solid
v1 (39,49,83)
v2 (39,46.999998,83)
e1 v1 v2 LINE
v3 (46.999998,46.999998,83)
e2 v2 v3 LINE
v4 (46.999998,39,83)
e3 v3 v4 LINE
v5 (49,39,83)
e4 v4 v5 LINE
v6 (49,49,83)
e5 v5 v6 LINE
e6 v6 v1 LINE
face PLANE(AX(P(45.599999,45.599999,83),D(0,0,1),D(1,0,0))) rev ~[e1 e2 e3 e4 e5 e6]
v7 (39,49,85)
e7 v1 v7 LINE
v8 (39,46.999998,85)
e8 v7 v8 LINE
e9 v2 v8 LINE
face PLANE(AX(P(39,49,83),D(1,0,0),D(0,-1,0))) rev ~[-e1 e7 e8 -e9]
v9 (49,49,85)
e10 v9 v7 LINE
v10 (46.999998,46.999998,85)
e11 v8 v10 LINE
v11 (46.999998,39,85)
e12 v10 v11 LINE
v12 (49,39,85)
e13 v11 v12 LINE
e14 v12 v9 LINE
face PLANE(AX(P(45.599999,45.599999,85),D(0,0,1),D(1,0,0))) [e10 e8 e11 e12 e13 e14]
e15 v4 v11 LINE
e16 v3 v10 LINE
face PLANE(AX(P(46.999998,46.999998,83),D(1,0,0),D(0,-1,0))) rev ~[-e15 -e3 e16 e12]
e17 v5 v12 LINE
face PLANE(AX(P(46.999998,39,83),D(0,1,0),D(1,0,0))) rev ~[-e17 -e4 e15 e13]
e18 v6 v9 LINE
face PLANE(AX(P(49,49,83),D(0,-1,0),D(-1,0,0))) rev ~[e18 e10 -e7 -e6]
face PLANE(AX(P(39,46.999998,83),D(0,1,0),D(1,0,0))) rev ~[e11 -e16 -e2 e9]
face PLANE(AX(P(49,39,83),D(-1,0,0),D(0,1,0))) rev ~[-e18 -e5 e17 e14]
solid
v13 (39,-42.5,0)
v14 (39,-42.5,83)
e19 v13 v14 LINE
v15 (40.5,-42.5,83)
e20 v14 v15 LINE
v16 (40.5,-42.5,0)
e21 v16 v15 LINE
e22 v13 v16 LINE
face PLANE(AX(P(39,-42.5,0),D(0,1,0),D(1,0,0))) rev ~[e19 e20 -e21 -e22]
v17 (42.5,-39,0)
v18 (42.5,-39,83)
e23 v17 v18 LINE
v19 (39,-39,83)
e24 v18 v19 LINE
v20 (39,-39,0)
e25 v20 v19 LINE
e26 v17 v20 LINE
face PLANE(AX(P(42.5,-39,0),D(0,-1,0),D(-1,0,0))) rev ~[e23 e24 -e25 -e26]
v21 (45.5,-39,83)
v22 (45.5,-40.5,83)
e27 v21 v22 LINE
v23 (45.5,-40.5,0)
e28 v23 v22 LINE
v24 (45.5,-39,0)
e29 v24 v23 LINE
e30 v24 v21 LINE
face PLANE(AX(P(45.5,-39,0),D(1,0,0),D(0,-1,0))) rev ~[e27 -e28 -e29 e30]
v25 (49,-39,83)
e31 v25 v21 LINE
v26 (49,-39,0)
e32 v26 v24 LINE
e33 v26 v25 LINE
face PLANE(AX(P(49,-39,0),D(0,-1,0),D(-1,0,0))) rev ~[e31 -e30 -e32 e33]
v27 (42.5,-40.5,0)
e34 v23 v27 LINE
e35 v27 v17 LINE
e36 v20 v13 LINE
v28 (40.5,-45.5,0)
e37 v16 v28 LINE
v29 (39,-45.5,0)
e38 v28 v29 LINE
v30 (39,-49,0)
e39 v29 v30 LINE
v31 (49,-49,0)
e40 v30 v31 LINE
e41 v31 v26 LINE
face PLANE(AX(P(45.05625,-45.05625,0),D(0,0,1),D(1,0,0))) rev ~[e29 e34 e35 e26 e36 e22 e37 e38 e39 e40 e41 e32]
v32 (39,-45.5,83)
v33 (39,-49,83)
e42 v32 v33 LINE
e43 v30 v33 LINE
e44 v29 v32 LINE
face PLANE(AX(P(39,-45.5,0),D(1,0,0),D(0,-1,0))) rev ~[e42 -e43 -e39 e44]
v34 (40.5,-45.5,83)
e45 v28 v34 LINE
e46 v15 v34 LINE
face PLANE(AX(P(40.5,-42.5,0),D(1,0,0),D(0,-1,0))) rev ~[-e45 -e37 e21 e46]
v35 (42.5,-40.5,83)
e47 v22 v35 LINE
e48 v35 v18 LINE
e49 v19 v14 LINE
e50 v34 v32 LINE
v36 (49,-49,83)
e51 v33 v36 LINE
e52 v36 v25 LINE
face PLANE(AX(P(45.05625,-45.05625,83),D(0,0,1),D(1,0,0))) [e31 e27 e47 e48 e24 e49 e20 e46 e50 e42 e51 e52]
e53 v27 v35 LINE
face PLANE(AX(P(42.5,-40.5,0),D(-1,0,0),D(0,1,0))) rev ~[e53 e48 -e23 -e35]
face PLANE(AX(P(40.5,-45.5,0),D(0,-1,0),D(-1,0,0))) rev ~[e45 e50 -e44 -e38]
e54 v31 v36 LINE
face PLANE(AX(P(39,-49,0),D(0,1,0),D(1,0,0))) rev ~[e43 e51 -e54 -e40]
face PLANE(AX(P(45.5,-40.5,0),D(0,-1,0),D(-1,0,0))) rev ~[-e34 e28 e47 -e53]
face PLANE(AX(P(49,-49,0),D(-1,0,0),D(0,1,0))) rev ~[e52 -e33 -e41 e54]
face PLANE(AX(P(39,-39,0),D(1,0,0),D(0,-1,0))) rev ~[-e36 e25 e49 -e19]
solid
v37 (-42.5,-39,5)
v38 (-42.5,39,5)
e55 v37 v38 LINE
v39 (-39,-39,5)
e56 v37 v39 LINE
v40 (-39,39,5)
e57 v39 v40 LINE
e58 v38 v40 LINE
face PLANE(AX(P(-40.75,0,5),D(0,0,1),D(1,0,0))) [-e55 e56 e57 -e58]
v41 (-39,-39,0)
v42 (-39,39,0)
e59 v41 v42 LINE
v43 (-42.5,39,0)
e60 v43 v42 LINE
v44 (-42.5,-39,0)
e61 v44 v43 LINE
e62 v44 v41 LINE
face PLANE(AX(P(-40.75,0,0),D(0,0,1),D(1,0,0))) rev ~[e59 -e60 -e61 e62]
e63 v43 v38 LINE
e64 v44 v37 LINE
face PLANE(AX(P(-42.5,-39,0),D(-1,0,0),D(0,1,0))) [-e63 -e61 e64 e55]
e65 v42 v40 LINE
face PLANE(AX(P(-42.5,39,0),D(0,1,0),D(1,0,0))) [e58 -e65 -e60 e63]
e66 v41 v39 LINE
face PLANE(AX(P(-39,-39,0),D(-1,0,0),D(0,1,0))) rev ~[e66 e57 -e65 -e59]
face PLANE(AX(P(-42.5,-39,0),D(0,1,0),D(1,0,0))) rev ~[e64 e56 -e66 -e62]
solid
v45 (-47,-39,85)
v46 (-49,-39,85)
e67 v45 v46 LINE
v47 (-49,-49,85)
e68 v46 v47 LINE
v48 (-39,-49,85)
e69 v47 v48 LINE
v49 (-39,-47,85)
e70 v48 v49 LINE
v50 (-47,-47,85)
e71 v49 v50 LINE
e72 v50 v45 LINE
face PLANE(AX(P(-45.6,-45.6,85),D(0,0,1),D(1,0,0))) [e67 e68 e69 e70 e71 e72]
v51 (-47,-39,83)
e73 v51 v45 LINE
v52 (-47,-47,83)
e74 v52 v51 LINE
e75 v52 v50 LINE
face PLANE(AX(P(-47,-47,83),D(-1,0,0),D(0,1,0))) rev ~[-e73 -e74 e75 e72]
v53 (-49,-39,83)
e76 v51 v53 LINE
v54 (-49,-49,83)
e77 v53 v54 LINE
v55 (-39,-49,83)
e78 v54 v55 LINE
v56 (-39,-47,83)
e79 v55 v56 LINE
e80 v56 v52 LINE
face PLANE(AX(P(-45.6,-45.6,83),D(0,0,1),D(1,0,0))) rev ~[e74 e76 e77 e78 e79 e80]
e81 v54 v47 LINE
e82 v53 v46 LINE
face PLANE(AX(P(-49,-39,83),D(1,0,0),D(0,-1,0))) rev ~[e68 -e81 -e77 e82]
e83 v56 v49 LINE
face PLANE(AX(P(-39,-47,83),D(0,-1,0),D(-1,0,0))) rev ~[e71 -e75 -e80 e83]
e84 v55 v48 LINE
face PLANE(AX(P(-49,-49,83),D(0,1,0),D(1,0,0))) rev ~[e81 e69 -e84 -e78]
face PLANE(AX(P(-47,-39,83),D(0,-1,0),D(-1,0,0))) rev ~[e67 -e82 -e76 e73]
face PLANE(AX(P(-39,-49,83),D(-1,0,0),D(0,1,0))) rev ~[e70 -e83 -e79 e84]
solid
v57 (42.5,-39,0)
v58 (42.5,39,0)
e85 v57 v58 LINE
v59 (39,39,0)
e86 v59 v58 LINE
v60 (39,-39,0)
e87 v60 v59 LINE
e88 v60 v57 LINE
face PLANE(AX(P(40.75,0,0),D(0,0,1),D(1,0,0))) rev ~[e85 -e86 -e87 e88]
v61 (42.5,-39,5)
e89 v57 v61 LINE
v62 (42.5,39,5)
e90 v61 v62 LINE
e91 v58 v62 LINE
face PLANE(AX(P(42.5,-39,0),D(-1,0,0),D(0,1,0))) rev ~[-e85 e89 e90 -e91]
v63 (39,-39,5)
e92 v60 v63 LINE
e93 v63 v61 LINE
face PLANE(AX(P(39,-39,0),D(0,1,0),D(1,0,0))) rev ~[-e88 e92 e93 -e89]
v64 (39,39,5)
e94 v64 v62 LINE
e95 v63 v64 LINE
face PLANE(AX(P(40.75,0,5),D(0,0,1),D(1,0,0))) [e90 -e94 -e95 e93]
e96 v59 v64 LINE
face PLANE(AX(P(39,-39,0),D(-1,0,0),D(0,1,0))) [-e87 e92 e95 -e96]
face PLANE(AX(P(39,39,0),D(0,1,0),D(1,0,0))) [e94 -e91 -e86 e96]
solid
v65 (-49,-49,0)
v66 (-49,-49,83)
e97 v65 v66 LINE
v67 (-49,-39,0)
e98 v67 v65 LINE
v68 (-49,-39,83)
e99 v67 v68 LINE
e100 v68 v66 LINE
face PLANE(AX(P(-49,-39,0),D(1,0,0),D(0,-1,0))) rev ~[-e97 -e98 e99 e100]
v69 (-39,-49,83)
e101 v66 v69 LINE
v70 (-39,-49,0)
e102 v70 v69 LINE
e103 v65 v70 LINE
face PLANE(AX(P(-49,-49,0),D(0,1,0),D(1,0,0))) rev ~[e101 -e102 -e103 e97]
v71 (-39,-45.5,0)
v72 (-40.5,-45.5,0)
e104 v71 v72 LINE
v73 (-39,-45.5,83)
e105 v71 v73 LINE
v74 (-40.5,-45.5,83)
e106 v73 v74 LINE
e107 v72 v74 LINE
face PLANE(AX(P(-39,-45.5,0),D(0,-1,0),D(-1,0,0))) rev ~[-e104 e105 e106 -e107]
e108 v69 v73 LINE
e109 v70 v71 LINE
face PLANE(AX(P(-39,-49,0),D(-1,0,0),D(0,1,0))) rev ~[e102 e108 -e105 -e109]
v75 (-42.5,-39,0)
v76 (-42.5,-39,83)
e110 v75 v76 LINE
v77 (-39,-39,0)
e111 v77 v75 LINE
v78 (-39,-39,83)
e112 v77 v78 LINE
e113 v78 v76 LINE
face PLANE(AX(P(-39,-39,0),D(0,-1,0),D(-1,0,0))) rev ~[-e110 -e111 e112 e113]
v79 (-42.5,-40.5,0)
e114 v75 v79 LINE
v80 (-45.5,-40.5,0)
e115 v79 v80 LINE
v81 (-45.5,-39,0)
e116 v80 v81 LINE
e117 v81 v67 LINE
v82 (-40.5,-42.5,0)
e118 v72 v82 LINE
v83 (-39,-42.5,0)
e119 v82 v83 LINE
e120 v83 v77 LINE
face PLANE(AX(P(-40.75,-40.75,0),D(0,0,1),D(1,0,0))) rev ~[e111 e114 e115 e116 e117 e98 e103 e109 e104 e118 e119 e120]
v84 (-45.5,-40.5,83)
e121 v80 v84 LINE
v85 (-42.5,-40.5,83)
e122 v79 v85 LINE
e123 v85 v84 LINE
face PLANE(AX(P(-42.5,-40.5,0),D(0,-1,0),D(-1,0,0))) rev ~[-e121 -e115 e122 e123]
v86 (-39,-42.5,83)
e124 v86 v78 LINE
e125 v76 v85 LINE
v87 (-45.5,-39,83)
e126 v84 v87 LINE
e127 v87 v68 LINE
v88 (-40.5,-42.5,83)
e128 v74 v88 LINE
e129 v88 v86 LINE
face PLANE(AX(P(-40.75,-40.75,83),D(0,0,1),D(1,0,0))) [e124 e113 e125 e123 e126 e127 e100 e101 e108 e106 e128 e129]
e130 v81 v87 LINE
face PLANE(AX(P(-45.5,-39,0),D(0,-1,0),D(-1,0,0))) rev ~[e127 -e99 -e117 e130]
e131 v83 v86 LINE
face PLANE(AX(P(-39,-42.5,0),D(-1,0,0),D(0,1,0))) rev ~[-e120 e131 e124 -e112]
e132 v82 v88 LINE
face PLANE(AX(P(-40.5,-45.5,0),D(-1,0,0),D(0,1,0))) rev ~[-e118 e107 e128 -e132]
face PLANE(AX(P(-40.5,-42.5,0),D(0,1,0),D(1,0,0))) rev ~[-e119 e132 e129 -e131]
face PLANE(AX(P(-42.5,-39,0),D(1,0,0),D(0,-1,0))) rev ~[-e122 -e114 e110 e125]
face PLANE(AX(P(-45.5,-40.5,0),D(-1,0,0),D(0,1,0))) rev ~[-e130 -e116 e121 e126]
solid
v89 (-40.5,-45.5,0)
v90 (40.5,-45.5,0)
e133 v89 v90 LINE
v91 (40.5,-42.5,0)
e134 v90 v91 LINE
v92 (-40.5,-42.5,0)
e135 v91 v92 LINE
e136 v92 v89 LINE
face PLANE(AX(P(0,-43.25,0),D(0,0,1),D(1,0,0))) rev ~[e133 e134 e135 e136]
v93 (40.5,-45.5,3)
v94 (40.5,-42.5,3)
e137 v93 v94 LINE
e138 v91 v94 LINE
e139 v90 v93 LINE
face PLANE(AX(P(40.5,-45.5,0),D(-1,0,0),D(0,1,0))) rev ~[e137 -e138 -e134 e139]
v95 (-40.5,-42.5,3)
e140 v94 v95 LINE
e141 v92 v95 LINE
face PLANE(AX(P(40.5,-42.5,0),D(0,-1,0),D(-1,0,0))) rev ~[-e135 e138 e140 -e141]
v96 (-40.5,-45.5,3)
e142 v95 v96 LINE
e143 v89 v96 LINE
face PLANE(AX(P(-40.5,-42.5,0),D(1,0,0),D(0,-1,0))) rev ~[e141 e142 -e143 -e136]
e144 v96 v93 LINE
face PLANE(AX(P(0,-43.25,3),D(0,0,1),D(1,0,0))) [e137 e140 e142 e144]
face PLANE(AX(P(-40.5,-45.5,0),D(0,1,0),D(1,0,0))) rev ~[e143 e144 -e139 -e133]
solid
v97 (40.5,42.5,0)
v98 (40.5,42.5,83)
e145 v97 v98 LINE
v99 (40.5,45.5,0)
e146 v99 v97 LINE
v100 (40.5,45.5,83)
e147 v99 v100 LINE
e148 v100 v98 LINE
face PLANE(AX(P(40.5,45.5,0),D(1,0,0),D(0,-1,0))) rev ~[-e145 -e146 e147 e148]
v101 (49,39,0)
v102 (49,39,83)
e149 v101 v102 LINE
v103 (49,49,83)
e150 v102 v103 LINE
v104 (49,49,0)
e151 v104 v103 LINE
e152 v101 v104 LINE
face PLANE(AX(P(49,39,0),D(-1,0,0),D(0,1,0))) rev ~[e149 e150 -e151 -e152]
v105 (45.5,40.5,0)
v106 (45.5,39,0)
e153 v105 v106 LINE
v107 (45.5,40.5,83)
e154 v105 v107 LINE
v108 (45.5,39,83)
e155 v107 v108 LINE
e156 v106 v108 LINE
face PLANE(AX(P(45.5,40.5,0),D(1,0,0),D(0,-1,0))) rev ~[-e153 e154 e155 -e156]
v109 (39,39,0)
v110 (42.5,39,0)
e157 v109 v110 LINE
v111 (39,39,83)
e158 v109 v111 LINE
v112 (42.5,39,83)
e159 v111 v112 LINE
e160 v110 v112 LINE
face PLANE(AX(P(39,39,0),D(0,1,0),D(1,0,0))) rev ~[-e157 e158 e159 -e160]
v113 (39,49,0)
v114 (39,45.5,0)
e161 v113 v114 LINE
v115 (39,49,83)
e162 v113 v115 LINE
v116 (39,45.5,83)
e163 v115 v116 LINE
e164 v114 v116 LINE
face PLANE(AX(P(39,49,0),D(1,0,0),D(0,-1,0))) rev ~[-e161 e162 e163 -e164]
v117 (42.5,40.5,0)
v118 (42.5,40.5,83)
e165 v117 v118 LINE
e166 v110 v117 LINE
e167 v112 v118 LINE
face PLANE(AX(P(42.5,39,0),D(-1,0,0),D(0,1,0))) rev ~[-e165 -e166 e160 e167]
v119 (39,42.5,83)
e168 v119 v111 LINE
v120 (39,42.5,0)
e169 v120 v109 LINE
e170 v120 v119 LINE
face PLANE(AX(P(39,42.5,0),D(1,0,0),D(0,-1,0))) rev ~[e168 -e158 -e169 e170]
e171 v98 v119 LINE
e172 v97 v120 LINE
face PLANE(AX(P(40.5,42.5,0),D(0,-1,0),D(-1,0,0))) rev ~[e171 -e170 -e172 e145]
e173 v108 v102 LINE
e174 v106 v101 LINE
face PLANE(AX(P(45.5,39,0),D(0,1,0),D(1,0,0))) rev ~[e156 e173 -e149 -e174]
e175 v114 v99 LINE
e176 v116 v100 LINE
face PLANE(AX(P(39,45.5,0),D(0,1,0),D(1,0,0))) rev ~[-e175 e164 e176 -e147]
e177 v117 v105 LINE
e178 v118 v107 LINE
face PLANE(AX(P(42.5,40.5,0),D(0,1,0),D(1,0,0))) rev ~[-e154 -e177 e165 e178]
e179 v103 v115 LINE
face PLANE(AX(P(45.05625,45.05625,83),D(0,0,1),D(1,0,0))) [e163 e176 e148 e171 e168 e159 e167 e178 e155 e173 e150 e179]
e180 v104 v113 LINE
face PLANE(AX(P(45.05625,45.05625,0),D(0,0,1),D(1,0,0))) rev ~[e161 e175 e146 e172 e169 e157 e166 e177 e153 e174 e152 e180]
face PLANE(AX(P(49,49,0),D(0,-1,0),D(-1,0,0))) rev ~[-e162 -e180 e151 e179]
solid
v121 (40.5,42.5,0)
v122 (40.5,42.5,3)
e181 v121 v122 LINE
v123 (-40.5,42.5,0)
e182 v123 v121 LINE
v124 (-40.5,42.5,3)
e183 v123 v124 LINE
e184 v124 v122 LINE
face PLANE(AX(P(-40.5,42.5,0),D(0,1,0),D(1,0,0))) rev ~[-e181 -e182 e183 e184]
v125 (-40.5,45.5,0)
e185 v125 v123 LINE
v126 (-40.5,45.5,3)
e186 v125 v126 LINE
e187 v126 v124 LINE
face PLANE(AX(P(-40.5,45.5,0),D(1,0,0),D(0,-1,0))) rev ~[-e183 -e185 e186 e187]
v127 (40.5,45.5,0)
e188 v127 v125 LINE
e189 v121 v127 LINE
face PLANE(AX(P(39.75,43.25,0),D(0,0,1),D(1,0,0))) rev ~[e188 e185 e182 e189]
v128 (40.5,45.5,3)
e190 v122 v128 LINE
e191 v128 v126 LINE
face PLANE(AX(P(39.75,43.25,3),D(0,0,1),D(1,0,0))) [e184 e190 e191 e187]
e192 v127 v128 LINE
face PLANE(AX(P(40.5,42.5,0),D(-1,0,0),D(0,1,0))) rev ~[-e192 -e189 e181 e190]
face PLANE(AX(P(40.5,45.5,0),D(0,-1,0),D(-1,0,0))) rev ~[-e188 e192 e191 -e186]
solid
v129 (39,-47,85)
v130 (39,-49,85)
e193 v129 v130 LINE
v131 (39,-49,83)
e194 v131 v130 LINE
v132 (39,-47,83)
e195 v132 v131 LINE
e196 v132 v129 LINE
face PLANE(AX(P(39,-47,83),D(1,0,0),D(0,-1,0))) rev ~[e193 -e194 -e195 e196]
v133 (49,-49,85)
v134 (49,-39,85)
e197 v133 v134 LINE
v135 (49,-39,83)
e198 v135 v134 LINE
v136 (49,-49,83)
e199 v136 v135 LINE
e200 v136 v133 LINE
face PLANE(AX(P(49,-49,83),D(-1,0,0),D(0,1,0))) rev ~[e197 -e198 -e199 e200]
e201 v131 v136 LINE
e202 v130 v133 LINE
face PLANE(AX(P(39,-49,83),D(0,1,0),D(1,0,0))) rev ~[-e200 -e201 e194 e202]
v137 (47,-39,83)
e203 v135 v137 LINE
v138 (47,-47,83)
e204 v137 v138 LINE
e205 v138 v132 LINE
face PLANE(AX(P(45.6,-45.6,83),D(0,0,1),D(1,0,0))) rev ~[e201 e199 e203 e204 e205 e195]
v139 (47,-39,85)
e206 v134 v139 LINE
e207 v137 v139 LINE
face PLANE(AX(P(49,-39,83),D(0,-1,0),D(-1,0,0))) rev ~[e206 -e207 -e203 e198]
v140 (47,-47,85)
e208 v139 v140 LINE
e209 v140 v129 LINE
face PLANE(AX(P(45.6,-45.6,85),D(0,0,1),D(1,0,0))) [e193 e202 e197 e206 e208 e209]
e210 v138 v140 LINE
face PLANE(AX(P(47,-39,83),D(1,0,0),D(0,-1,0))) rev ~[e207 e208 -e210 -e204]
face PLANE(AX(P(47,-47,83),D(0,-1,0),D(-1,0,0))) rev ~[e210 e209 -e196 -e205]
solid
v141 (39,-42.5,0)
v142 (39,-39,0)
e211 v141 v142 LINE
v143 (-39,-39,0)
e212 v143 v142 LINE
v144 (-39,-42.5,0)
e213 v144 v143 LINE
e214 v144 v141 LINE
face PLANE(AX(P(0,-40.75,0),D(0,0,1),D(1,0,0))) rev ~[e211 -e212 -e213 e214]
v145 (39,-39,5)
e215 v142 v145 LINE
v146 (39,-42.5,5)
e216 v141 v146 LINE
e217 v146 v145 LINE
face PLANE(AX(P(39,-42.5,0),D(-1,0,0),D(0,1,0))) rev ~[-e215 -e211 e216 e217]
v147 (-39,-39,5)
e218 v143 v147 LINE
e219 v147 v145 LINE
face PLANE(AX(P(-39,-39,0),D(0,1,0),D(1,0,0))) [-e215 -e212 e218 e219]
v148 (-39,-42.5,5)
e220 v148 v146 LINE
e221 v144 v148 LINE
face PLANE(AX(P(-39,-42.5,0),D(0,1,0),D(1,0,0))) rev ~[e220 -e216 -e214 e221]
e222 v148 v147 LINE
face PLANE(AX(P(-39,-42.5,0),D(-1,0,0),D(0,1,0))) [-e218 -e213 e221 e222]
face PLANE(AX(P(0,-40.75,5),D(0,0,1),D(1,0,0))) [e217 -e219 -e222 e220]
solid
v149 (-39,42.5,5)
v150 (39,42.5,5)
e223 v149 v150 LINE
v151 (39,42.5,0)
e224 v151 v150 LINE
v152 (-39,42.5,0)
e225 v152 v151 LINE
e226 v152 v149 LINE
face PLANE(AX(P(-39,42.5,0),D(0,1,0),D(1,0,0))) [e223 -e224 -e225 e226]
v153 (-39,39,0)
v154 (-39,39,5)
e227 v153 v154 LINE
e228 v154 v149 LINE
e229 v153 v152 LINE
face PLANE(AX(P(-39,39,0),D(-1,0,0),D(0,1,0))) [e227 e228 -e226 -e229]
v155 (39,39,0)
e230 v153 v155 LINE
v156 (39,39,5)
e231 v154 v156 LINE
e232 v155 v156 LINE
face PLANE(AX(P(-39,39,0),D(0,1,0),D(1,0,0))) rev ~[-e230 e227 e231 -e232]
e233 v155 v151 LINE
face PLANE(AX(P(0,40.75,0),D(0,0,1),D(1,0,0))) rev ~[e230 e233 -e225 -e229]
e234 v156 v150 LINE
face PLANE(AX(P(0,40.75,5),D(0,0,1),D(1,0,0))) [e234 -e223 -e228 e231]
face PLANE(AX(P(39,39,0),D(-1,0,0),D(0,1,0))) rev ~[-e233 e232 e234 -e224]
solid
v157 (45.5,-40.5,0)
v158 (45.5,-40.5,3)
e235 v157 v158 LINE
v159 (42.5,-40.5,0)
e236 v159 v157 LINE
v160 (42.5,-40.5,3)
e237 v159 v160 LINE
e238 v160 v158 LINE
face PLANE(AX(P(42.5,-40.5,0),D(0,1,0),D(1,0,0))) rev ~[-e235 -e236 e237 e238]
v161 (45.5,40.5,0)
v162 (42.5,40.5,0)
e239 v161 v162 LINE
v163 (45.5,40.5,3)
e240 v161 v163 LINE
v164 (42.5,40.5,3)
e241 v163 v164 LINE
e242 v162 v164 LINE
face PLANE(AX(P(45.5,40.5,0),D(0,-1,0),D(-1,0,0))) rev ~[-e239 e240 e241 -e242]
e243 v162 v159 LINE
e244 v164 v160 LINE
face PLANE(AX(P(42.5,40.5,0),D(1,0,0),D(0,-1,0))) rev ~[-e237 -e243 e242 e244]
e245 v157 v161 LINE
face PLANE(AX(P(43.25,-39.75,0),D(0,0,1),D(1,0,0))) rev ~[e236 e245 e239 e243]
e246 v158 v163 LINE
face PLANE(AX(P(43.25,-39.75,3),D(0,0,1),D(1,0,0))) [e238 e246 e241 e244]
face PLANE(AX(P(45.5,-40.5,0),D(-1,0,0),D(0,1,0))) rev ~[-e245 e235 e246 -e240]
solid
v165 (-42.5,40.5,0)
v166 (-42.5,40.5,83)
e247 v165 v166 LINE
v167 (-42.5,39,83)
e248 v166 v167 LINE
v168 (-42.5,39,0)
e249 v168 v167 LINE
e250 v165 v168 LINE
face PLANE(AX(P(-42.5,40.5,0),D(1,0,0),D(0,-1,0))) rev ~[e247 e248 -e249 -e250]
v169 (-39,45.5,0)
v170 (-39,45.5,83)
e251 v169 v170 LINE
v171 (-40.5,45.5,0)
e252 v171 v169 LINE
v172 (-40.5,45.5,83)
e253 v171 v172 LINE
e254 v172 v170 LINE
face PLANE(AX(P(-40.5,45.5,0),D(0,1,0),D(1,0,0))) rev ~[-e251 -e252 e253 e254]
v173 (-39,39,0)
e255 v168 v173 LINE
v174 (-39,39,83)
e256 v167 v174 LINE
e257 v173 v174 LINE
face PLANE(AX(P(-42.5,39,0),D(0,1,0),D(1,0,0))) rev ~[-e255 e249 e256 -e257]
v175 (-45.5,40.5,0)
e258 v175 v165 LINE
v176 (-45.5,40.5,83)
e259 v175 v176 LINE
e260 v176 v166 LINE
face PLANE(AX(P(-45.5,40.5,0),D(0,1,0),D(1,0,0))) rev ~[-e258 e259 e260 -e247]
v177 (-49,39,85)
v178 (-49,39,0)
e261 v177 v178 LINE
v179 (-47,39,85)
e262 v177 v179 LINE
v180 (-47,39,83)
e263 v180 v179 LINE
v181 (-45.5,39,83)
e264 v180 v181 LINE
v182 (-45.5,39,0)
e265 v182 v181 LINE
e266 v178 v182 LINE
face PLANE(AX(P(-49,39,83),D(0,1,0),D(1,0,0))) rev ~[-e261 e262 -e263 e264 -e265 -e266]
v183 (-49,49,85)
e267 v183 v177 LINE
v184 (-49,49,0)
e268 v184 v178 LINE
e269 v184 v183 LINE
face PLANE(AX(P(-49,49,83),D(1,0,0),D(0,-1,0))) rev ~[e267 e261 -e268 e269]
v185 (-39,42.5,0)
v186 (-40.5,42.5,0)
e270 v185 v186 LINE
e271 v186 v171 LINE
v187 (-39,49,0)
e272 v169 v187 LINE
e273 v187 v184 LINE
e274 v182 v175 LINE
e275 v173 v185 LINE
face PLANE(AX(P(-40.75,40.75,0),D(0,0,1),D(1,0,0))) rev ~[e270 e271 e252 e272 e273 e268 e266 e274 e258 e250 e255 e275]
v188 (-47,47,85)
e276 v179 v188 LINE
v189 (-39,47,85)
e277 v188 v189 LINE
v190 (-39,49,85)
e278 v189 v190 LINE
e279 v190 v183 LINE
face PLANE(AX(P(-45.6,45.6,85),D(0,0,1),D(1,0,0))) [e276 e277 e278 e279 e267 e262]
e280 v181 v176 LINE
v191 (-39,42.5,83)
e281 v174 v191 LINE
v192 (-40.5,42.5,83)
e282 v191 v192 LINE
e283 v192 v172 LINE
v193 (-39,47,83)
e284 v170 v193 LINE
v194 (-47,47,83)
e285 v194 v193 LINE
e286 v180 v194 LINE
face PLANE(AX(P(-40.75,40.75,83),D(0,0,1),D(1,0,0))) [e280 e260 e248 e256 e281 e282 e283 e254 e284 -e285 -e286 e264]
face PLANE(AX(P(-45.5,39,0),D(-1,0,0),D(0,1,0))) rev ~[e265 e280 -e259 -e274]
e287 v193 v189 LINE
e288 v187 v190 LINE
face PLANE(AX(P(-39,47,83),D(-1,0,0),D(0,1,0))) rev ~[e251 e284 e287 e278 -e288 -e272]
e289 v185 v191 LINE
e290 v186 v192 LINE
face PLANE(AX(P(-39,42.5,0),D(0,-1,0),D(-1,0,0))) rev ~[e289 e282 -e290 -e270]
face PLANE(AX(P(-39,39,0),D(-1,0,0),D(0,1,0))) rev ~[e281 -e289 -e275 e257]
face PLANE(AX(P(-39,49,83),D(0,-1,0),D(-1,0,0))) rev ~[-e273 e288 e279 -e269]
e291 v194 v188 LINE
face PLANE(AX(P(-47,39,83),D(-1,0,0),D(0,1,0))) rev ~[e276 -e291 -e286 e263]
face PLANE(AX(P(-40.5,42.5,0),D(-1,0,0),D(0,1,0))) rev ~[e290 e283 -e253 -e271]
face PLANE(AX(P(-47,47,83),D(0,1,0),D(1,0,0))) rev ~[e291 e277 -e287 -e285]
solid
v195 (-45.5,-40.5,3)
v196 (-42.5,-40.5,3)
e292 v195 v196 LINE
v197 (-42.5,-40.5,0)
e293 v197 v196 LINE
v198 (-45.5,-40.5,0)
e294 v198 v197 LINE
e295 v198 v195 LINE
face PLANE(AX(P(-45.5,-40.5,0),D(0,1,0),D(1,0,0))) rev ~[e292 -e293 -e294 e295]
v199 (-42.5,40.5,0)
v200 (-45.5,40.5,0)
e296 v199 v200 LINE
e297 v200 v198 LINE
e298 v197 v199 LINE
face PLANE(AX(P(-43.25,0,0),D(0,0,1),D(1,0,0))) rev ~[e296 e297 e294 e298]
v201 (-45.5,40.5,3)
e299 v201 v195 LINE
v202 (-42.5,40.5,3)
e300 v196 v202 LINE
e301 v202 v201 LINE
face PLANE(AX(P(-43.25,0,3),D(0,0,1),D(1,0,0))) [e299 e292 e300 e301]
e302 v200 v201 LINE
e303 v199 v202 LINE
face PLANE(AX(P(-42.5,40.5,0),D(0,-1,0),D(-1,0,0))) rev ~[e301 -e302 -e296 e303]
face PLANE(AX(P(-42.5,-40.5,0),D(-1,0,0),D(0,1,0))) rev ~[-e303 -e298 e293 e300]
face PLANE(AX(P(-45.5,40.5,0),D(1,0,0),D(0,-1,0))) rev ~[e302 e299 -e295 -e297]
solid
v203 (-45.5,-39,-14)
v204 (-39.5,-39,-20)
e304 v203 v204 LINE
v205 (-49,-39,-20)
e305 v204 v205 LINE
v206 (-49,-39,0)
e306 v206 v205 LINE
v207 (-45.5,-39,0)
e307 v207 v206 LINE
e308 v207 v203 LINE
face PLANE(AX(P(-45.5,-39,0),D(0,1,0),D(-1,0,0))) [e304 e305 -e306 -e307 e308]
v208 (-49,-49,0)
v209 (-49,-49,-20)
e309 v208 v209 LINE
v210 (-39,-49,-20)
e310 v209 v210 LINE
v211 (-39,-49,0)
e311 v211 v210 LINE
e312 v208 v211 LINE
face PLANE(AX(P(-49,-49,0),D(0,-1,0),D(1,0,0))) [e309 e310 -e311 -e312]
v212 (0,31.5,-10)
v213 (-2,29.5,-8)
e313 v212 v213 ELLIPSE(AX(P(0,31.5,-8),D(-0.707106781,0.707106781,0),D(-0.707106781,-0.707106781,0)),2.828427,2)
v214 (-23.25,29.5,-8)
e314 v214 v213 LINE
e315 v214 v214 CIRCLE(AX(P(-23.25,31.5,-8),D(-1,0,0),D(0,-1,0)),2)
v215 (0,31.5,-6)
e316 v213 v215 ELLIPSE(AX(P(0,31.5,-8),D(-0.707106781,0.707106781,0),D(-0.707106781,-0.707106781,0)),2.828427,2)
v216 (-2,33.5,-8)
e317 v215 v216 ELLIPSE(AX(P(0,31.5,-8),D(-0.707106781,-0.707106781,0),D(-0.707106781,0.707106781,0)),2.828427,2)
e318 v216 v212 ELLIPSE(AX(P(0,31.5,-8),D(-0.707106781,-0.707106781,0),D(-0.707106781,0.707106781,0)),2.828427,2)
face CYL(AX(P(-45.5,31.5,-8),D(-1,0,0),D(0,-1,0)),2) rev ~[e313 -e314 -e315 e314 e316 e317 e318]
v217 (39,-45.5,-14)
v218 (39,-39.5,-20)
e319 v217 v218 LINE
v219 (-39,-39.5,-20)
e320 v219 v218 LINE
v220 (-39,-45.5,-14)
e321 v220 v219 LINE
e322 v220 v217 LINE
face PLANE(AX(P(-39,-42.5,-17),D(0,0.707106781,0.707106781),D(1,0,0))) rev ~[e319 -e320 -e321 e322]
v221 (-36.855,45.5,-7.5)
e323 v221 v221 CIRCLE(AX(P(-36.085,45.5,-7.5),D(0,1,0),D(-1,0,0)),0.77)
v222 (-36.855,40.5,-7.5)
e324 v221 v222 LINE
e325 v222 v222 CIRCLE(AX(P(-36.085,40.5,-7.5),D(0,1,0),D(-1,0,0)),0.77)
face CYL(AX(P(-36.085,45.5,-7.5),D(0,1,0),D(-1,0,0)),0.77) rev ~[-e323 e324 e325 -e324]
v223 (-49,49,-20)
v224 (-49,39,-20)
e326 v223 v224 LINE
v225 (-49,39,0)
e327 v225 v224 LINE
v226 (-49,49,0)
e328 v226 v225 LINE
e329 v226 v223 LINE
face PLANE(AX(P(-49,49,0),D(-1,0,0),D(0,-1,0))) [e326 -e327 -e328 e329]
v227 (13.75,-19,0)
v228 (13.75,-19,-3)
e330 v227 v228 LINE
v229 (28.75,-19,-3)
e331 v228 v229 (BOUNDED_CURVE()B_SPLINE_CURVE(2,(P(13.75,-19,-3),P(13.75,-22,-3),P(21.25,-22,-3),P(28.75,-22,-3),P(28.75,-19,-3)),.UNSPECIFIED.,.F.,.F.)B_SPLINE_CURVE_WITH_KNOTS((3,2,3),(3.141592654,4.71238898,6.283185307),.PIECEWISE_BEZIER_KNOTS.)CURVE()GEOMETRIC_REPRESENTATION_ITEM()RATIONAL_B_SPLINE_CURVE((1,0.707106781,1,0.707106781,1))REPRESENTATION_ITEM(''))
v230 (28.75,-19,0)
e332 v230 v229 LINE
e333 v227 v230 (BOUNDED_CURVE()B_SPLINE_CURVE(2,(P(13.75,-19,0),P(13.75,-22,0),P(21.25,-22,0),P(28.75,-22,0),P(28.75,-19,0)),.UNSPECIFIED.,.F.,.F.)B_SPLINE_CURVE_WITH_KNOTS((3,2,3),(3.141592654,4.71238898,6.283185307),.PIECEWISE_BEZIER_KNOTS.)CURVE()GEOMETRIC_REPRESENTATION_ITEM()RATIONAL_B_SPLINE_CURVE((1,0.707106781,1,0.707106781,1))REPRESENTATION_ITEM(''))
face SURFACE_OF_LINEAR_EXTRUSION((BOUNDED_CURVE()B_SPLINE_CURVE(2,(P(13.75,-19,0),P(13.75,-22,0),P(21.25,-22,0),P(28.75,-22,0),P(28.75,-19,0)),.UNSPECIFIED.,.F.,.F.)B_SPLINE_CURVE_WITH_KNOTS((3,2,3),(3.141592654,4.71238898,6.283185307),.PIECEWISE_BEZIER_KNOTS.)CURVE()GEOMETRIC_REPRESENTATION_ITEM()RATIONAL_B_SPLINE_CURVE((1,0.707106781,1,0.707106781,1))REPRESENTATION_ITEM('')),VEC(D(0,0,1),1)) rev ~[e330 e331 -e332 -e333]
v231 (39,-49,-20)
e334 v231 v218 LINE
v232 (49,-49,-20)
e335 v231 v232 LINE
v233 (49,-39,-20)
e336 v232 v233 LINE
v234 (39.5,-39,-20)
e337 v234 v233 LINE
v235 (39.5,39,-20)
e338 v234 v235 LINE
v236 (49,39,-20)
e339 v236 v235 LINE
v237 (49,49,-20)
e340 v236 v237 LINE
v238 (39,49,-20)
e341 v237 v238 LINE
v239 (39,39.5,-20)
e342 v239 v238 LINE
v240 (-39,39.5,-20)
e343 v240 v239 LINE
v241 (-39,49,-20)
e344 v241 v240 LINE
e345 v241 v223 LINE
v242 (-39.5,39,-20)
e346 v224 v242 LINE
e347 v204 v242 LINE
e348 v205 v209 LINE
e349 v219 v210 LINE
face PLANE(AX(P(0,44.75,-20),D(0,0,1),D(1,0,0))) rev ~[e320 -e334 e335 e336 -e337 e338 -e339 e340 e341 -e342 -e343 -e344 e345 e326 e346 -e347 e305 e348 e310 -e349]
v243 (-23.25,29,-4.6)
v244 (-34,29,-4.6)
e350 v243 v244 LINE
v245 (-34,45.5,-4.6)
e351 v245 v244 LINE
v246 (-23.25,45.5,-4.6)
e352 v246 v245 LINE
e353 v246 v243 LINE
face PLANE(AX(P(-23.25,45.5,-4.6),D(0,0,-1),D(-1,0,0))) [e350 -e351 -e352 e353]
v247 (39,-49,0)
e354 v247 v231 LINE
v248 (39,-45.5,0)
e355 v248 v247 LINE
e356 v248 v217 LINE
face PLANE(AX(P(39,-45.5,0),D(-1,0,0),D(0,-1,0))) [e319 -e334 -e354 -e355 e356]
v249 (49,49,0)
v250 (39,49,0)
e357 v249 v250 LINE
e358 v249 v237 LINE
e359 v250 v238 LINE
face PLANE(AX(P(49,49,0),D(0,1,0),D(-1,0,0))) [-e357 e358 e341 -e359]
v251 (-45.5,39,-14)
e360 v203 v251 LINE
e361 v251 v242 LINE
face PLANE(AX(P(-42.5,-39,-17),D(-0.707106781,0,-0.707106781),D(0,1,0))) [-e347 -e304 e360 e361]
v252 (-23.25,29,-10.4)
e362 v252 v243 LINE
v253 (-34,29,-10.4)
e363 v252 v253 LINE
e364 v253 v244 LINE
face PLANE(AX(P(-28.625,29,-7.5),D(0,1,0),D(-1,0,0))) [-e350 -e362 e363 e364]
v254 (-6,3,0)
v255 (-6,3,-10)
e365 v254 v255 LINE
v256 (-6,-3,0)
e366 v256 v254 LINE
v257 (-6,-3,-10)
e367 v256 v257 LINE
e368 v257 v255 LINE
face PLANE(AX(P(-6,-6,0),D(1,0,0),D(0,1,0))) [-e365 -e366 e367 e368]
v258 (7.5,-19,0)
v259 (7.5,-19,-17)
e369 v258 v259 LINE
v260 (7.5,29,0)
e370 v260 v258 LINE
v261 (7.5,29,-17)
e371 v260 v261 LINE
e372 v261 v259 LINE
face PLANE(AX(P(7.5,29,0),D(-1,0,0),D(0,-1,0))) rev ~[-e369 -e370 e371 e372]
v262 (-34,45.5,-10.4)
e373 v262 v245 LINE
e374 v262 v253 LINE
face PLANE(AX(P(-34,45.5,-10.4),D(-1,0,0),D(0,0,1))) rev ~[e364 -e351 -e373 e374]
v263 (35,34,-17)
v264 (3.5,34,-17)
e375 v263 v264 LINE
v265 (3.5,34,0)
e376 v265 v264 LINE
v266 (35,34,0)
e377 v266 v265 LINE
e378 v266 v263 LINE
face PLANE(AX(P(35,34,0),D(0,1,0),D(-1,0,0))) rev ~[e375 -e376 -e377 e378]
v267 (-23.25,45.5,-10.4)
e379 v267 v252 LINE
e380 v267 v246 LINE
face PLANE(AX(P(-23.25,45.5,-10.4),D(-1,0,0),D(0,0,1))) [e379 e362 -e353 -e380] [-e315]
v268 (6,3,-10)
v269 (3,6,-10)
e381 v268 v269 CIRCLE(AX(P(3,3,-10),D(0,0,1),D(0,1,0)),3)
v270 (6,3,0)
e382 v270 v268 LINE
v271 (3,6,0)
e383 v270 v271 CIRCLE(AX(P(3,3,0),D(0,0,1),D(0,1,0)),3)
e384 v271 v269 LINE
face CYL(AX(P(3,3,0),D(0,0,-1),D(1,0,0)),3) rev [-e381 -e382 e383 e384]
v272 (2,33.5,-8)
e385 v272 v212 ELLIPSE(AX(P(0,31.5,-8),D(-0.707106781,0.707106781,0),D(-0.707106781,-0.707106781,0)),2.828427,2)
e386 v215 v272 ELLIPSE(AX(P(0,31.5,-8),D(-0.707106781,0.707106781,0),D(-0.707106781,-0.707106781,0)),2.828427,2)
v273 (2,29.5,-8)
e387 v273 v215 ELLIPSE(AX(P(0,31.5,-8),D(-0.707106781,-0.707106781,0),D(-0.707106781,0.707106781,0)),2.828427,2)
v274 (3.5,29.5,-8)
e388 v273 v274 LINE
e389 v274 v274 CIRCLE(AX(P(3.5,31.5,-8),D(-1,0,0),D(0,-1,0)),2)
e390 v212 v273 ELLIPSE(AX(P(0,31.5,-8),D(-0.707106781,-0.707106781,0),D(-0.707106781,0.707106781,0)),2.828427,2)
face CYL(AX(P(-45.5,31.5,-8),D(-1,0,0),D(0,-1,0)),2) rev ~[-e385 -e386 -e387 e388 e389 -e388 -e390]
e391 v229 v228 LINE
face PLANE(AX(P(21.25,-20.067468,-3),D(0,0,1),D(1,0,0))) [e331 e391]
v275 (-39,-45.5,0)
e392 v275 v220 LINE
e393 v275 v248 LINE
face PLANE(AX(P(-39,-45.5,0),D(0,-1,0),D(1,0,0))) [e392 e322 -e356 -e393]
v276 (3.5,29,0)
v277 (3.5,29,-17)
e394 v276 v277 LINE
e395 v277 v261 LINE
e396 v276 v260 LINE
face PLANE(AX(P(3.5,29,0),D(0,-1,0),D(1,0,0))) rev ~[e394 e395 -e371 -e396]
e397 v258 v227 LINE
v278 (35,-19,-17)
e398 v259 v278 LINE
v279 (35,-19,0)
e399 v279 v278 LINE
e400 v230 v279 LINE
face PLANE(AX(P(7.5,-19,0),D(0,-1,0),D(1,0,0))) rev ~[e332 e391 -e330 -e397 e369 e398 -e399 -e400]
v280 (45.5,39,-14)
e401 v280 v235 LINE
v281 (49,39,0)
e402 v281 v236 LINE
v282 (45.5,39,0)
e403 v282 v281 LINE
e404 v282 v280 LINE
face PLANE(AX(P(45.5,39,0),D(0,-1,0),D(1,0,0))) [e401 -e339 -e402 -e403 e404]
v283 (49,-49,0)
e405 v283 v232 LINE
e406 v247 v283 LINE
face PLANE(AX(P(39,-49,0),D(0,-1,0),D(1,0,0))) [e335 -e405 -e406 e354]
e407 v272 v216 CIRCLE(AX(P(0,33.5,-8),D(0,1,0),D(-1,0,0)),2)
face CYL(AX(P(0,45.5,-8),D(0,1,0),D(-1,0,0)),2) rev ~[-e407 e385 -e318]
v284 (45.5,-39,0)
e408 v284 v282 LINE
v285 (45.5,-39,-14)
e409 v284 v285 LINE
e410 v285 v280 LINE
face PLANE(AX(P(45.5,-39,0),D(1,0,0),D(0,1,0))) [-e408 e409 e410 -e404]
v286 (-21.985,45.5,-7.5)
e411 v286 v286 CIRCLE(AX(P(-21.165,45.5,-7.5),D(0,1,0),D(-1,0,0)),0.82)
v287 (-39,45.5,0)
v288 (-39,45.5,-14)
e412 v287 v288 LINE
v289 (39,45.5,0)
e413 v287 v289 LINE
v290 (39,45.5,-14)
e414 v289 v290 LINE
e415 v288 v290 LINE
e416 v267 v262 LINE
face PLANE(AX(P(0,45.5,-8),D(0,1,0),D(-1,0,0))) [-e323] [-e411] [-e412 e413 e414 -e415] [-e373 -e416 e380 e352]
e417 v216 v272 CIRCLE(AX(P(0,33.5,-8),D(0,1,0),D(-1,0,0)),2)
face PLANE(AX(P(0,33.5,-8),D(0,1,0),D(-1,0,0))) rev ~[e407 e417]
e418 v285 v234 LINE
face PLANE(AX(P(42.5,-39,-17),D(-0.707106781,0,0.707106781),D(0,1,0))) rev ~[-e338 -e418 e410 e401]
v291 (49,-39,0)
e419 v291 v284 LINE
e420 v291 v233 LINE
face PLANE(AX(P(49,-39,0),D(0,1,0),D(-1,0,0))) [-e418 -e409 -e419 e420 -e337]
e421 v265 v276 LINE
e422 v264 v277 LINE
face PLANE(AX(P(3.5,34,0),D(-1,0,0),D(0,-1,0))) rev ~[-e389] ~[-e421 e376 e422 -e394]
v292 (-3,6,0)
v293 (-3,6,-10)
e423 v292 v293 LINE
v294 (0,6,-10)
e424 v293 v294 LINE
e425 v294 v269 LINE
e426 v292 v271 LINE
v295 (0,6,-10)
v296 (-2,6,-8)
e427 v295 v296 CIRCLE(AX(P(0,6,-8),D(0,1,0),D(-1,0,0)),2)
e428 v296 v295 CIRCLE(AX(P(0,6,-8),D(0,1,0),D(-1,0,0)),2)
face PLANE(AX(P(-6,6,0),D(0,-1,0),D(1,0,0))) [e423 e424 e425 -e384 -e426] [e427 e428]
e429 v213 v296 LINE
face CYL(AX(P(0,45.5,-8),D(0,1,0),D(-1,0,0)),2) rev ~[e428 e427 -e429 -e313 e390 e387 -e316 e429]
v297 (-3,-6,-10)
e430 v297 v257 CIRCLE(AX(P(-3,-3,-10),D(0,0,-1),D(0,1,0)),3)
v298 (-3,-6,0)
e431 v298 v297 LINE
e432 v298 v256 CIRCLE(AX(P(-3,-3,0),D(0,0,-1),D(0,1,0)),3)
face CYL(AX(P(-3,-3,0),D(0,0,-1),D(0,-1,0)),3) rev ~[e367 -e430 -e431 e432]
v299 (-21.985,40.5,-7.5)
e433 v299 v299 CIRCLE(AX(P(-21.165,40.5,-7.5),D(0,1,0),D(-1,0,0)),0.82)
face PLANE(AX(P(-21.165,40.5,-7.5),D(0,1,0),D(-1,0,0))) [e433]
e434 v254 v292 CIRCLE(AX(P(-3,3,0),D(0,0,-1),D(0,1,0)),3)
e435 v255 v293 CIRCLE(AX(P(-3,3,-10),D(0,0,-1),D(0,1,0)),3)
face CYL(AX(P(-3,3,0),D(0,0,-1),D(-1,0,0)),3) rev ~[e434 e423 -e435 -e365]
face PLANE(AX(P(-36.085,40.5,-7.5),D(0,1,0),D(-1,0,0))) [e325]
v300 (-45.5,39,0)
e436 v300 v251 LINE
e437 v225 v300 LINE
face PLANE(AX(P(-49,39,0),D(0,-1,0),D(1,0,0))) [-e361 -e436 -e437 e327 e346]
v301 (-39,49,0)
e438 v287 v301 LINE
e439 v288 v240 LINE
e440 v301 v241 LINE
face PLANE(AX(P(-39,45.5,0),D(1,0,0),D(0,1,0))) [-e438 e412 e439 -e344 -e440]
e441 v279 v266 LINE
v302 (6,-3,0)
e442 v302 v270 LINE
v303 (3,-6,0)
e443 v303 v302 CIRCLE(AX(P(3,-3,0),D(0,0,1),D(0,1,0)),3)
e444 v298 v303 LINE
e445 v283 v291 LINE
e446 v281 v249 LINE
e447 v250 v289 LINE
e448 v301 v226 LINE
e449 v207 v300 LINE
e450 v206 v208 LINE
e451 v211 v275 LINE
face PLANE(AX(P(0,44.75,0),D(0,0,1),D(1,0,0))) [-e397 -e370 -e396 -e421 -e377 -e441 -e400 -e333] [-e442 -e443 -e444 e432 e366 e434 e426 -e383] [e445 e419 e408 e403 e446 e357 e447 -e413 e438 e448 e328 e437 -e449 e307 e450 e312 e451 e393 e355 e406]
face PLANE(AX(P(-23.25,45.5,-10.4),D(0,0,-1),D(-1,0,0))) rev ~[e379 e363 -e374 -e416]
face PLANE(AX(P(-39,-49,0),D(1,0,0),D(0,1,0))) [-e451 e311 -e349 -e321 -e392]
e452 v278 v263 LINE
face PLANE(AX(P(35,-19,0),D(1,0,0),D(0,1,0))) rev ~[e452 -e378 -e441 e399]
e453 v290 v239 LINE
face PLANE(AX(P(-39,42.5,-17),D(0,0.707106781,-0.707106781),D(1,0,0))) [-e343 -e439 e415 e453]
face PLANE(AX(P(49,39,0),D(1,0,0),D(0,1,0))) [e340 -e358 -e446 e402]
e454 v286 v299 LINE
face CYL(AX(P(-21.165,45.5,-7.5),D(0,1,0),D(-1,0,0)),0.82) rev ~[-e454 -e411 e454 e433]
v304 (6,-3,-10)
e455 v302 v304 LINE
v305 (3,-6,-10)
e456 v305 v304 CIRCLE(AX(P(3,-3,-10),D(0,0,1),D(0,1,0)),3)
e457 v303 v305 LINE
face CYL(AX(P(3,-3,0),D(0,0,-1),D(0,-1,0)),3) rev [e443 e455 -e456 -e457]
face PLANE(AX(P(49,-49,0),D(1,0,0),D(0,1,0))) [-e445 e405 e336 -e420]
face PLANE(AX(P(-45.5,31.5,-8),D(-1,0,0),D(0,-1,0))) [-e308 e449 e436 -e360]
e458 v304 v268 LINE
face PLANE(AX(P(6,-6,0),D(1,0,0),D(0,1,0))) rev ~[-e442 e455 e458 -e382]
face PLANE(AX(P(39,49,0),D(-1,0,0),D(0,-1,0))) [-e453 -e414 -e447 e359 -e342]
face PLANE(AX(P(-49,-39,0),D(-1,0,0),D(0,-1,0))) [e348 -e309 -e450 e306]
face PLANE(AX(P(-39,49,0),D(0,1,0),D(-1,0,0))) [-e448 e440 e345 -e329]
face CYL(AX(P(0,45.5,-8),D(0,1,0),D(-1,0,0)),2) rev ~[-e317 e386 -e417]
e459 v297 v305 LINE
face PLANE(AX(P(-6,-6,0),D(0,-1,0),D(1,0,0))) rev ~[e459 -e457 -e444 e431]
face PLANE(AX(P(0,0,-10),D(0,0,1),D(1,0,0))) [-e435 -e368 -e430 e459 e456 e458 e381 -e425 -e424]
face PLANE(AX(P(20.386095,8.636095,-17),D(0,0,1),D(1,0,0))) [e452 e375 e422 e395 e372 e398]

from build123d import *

# Parameters (mm, degrees)
F0_W      = 3.5
F0_H      = 78
F1_DEPTH  = 5
F0_W_2    = 78
F0_H_2    = 3.5
F2_DEPTH  = 83
F0_W_3    = 1.5
F0_H_3    = 1.5
F3_DEPTH  = 3
F4_DEPTH  = 20
F6_DEPTH  = 17
F5_W      = 12
F5_H      = 12
F7_DEPTH  = 10
F8_DEPTH  = 3
F9_R      = 3
F10_SIZE  = 6
F15_DEPTH = 2
F16_W     = 10.75
F16_H     = 5.8
F17_DEPTH = 16.5
F16_R     = 0.82
F16_R_2   = 0.77
F18_DEPTH = 5
F19_R     = 2
F20_DEPTH = 50
F21_DEPTH = 11.5
F16_R_3   = 2
F22_DEPTH = 41.6
F23_DEPTH = 12


with BuildPart() as f1:
    # F0 (on Top) → F1 (new body)
    with BuildSketch(Plane.XY):
        with Locations((-40.75, 0)):
            Rectangle(F0_W, F0_H)
    extrude(amount=F1_DEPTH)


with BuildPart() as f1b:
    # F0 (on Top) → F1, piece 2 (new body)
    with BuildSketch(Plane.XY):
        with Locations((0, 40.75)):
            Rectangle(F0_W_2, F0_H_2)
    extrude(amount=F1_DEPTH)


with BuildPart() as f1c:
    # F0 (on Top) → F1, piece 3 (new body)
    with BuildSketch(Plane.XY):
        with Locations((40.75, 0)):
            Rectangle(F0_W, F0_H)
    extrude(amount=F1_DEPTH)


with BuildPart() as f1d:
    # F0 (on Top) → F1, piece 4 (new body)
    with BuildSketch(Plane.XY):
        with Locations((0, -40.75)):
            Rectangle(F0_W_2, F0_H_2)
    extrude(amount=F1_DEPTH)


with BuildPart() as f2:
    # F0 (on Top) → F2 (new body)
    with BuildSketch(Plane.XY):
        Polygon((-39, 39), (-39, 42.5), (-40.5, 42.5), (-42.5, 42.5), (-42.5, 40.5), (-42.5, 39), align=None)
        Polygon((-40.5, 42.5), (-40.5, 44), (-44, 44), (-44, 40.5), (-42.5, 40.5), (-42.5, 42.5), align=None)
        Polygon((-44, 44), (-40.5, 44), (-40.5, 45.5), (-45.5, 45.5), (-45.5, 40.5), (-44, 40.5), align=None)
        Polygon((-40.5, 45.5), (-39, 45.5), (-39, 49), (-49, 49), (-49, 39), (-45.5, 39), (-45.5, 40.5), (-45.5, 45.5), align=None)
    extrude(amount=F2_DEPTH)

    # F12 (on face) → F15 (join)
    with BuildSketch(Plane.XY.offset(83)):
        Polygon((-47, 47), (-39, 47), (-39, 49), (-49, 49), (-49, 39), (-47, 39), align=None)
    extrude(amount=F15_DEPTH)


with BuildPart() as f2b:
    # F0 (on Top) → F2, piece 2 (new body)
    with BuildSketch(Plane.XY):
        Polygon((39, 45.5), (40.5, 45.5), (45.5, 45.5), (45.5, 40.5), (45.5, 39), (49, 39), (49, 49), (39, 49), align=None)
        Polygon((40.5, 44), (44, 44), (44, 40.5), (45.5, 40.5), (45.5, 45.5), (40.5, 45.5), align=None)
        Polygon((44, 40.5), (44, 44), (40.5, 44), (40.5, 42.5), (42.5, 42.5), (42.5, 40.5), align=None)
        Polygon((42.5, 42.5), (40.5, 42.5), (39, 42.5), (39, 39), (42.5, 39), (42.5, 40.5), align=None)
    extrude(amount=F2_DEPTH)


with BuildPart() as f2c:
    # F0 (on Top) → F2, piece 3 (new body)
    with BuildSketch(Plane.XY):
        Polygon((49, -39), (45.5, -39), (45.5, -40.5), (45.5, -45.5), (40.5, -45.5), (39, -45.5), (39, -49), (49, -49), align=None)
        Polygon((45.5, -40.5), (44, -40.5), (44, -44), (40.5, -44), (40.5, -45.5), (45.5, -45.5), align=None)
        Polygon((44, -44), (44, -40.5), (42.5, -40.5), (42.5, -42.5), (40.5, -42.5), (40.5, -44), align=None)
        Polygon((42.5, -40.5), (42.5, -39), (39, -39), (39, -42.5), (40.5, -42.5), (42.5, -42.5), align=None)
    extrude(amount=F2_DEPTH)


with BuildPart() as f2d:
    # F0 (on Top) → F2, piece 4 (new body)
    with BuildSketch(Plane.XY):
        Polygon((-39, -42.5), (-39, -39), (-42.5, -39), (-42.5, -40.5), (-42.5, -42.5), (-40.5, -42.5), align=None)
        Polygon((-42.5, -42.5), (-42.5, -40.5), (-44, -40.5), (-44, -44), (-40.5, -44), (-40.5, -42.5), align=None)
        Polygon((-44, -44), (-44, -40.5), (-45.5, -40.5), (-45.5, -45.5), (-40.5, -45.5), (-40.5, -44), align=None)
        Polygon((-45.5, -40.5), (-45.5, -39), (-49, -39), (-49, -49), (-39, -49), (-39, -45.5), (-40.5, -45.5), (-45.5, -45.5), align=None)
    extrude(amount=F2_DEPTH)


with BuildPart() as f3:
    # F0 (on Top) → F3 (new body)
    with BuildSketch(Plane.XY):
        with Locations((-43.25, 0)):
            Rectangle(F0_W_3, F0_H)
        with Locations((-44.75, 0)):
            Rectangle(F0_W_3, F0_H)
        with Locations((-43.25, 39.75)):
            Rectangle(F0_W_3, F0_H_3)
        with Locations((-44.75, 39.75)):
            Rectangle(F0_W_3, F0_H_3)
        with Locations((-43.25, -39.75)):
            Rectangle(F0_W_3, F0_H_3)
        with Locations((-44.75, -39.75)):
            Rectangle(F0_W_3, F0_H_3)
    extrude(amount=F3_DEPTH)


with BuildPart() as f3b:
    # F0 (on Top) → F3, piece 2 (new body)
    with BuildSketch(Plane.XY):
        with Locations((0, -43.25)):
            Rectangle(F0_W_2, F0_H_3)
        with Locations((-39.75, -43.25)):
            Rectangle(F0_W_3, F0_H_3)
        with Locations((-39.75, -44.75)):
            Rectangle(F0_W_3, F0_H_3)
        with Locations((0, -44.75)):
            Rectangle(F0_W_2, F0_H_3)
        with Locations((39.75, -44.75)):
            Rectangle(F0_W_3, F0_H_3)
        with Locations((39.75, -43.25)):
            Rectangle(F0_W_3, F0_H_3)
    extrude(amount=F3_DEPTH)


with BuildPart() as f3c:
    # F0 (on Top) → F3, piece 3 (new body)
    with BuildSketch(Plane.XY):
        with Locations((43.25, -39.75)):
            Rectangle(F0_W_3, F0_H_3)
        with Locations((44.75, -39.75)):
            Rectangle(F0_W_3, F0_H_3)
        with Locations((44.75, 0)):
            Rectangle(F0_W_3, F0_H)
        with Locations((43.25, 0)):
            Rectangle(F0_W_3, F0_H)
        with Locations((44.75, 39.75)):
            Rectangle(F0_W_3, F0_H_3)
        with Locations((43.25, 39.75)):
            Rectangle(F0_W_3, F0_H_3)
    extrude(amount=F3_DEPTH)


with BuildPart() as f3d:
    # F0 (on Top) → F3, piece 4 (new body)
    with BuildSketch(Plane.XY):
        with Locations((39.75, 43.25)):
            Rectangle(F0_W_3, F0_H_3)
        with Locations((39.75, 44.75)):
            Rectangle(F0_W_3, F0_H_3)
        with Locations((0, 44.75)):
            Rectangle(F0_W_2, F0_H_3)
        with Locations((0, 43.25)):
            Rectangle(F0_W_2, F0_H_3)
        with Locations((-39.75, 43.25)):
            Rectangle(F0_W_3, F0_H_3)
        with Locations((-39.75, 44.75)):
            Rectangle(F0_W_3, F0_H_3)
    extrude(amount=F3_DEPTH)


with BuildPart() as f4:
    # F0 (on Top) → F4 (new body)
    with BuildSketch(Plane.XY):
        with Locations((0, 44.75)):
            Rectangle(F0_W_2, F0_H_3)
        with Locations((0, -44.75)):
            Rectangle(F0_W_2, F0_H_3)
        with Locations((44.75, 0)):
            Rectangle(F0_W_3, F0_H)
        with Locations((-44.75, 0)):
            Rectangle(F0_W_3, F0_H)
        Polygon((39, 45.5), (40.5, 45.5), (45.5, 45.5), (45.5, 40.5), (45.5, 39), (49, 39), (49, 49), (39, 49), align=None)
        Polygon((49, -39), (45.5, -39), (45.5, -40.5), (45.5, -45.5), (40.5, -45.5), (39, -45.5), (39, -49), (49, -49), align=None)
        Polygon((-45.5, -40.5), (-45.5, -39), (-49, -39), (-49, -49), (-39, -49), (-39, -45.5), (-40.5, -45.5), (-45.5, -45.5), align=None)
        Polygon((-40.5, 45.5), (-39, 45.5), (-39, 49), (-49, 49), (-49, 39), (-45.5, 39), (-45.5, 40.5), (-45.5, 45.5), align=None)
        with Locations((39.75, 44.75)):
            Rectangle(F0_W_3, F0_H_3)
        with Locations((-39.75, 44.75)):
            Rectangle(F0_W_3, F0_H_3)
        with Locations((39.75, -44.75)):
            Rectangle(F0_W_3, F0_H_3)
        with Locations((-39.75, -44.75)):
            Rectangle(F0_W_3, F0_H_3)
        with Locations((44.75, 39.75)):
            Rectangle(F0_W_3, F0_H_3)
        with Locations((44.75, -39.75)):
            Rectangle(F0_W_3, F0_H_3)
        with Locations((-44.75, 39.75)):
            Rectangle(F0_W_3, F0_H_3)
        with Locations((-44.75, -39.75)):
            Rectangle(F0_W_3, F0_H_3)
        with Locations((40.75, 0)):
            Rectangle(F0_W, F0_H)
        with Locations((0, -43.25)):
            Rectangle(F0_W_2, F0_H_3)
        with Locations((0, 40.75)):
            Rectangle(F0_W_2, F0_H_2)
        with Locations((0, -40.75)):
            Rectangle(F0_W_2, F0_H_2)
        with Locations((0, 43.25)):
            Rectangle(F0_W_2, F0_H_3)
        with Locations((-40.75, 0)):
            Rectangle(F0_W, F0_H)
        Rectangle(F0_W_2, F0_H)
        Polygon((42.5, -40.5), (42.5, -39), (39, -39), (39, -42.5), (40.5, -42.5), (42.5, -42.5), align=None)
        with Locations((43.25, 39.75)):
            Rectangle(F0_W_3, F0_H_3)
        Polygon((-39, -42.5), (-39, -39), (-42.5, -39), (-42.5, -40.5), (-42.5, -42.5), (-40.5, -42.5), align=None)
        Polygon((-39, 39), (-39, 42.5), (-40.5, 42.5), (-42.5, 42.5), (-42.5, 40.5), (-42.5, 39), align=None)
        with Locations((43.25, 0)):
            Rectangle(F0_W_3, F0_H)
        Polygon((-44, 44), (-40.5, 44), (-40.5, 45.5), (-45.5, 45.5), (-45.5, 40.5), (-44, 40.5), align=None)
        Polygon((40.5, 44), (44, 44), (44, 40.5), (45.5, 40.5), (45.5, 45.5), (40.5, 45.5), align=None)
        Polygon((45.5, -40.5), (44, -40.5), (44, -44), (40.5, -44), (40.5, -45.5), (45.5, -45.5), align=None)
        with Locations((-43.25, 0)):
            Rectangle(F0_W_3, F0_H)
        Polygon((-44, -44), (-44, -40.5), (-45.5, -40.5), (-45.5, -45.5), (-40.5, -45.5), (-40.5, -44), align=None)
        with Locations((-43.25, -39.75)):
            Rectangle(F0_W_3, F0_H_3)
        with Locations((-43.25, 39.75)):
            Rectangle(F0_W_3, F0_H_3)
        Polygon((42.5, 42.5), (40.5, 42.5), (39, 42.5), (39, 39), (42.5, 39), (42.5, 40.5), align=None)
        with Locations((39.75, -43.25)):
            Rectangle(F0_W_3, F0_H_3)
        with Locations((43.25, -39.75)):
            Rectangle(F0_W_3, F0_H_3)
        with Locations((-39.75, -43.25)):
            Rectangle(F0_W_3, F0_H_3)
        with Locations((-39.75, 43.25)):
            Rectangle(F0_W_3, F0_H_3)
        Polygon((-40.5, 42.5), (-40.5, 44), (-44, 44), (-44, 40.5), (-42.5, 40.5), (-42.5, 42.5), align=None)
        Polygon((44, 40.5), (44, 44), (40.5, 44), (40.5, 42.5), (42.5, 42.5), (42.5, 40.5), align=None)
        with Locations((39.75, 43.25)):
            Rectangle(F0_W_3, F0_H_3)
        Polygon((44, -44), (44, -40.5), (42.5, -40.5), (42.5, -42.5), (40.5, -42.5), (40.5, -44), align=None)
        Polygon((-42.5, -42.5), (-42.5, -40.5), (-44, -40.5), (-44, -44), (-40.5, -44), (-40.5, -42.5), align=None)
    extrude(amount=-F4_DEPTH)

    # F5 (on face) → F6 (cut)
    with BuildSketch(Plane.XY):
        Polygon((35, 34), (7.5, 34), (3.5, 34), (3.5, 29), (7.5, 29), (7.5, -19), (13.75, -19), (28.75, -19), (35, -19), align=None)
    extrude(amount=-F6_DEPTH, mode=Mode.SUBTRACT)

    # F5 (on face) → F7 (cut)
    with BuildSketch(Plane.XY):
        Rectangle(F5_W, F5_H)
    extrude(amount=-F7_DEPTH, mode=Mode.SUBTRACT)

    # F5 (on face) → F8 (cut)
    with BuildSketch(Plane.XY):
        with BuildLine():
            add(Edge.make_bspline(
                [(13.75, -19), (13.75, -22), (21.25, -22), (28.75, -22), (28.75, -19)],
                knots=[3.1415926536, 3.1415926536, 3.1415926536, 4.7123889804, 4.7123889804, 6.2831853072, 6.2831853072, 6.2831853072], degree=2, weights=[1, 0.7071067812, 1, 0.7071067812, 1]))
            Line((28.75, -19), (13.75, -19))
        make_face()
    extrude(amount=-F8_DEPTH, mode=Mode.SUBTRACT)

    # F9
    f9_edges = [f4.edges().sort_by_distance(p)[0] for p in [
        (6, 6, -5),
        (6, -6, -5),
        (-6, -6, -5),
        (-6, 6, -5),
    ]]
    fillet(f9_edges, radius=F9_R)

    # F10
    f10_edges = [f4.edges().sort_by_distance(p)[0] for p in [
        (0, 45.5, -20),
        (-45.5, 0, -20),
        (0, -45.5, -20),
        (45.5, 0, -20),
    ]]
    chamfer(f10_edges, length=F10_SIZE)

    # F16 (on face) → F17 (cut)
    with BuildSketch(Plane(origin=(0, 45.5, 0), x_dir=(-1, 0, 0), z_dir=(0, 1, 0))):
        with Locations((28.625, -7.5)):
            Rectangle(F16_W, F16_H)
    extrude(amount=-F17_DEPTH, mode=Mode.SUBTRACT)

    # F16 (on face) → F18 (cut)
    with BuildSketch(Plane(origin=(0, 45.5, 0), x_dir=(-1, 0, 0), z_dir=(0, 1, 0))):
        with Locations((21.165, -7.5)):
            Circle(F16_R)
        with Locations((36.085, -7.5)):
            Circle(F16_R_2)
    extrude(amount=-F18_DEPTH, mode=Mode.SUBTRACT)

    # F19 (on face) → F20 (cut)
    with BuildSketch(Plane(origin=(-45.5, 0, 0), x_dir=(0, -1, 0), z_dir=(-1, 0, 0))):
        with Locations((-31.5, -8)):
            Circle(F19_R)
    extrude(amount=-F20_DEPTH, mode=Mode.SUBTRACT)

    # F19 (on face) → F21 (join)
    with BuildSketch(Plane(origin=(-45.5, 0, 0), x_dir=(0, -1, 0), z_dir=(-1, 0, 0))):
        with Locations((-31.5, -8)):
            Circle(F19_R)
    extrude(amount=-F21_DEPTH)

    # F16 (on face) → F22 (cut)
    with BuildSketch(Plane(origin=(0, 45.5, 0), x_dir=(-1, 0, 0), z_dir=(0, 1, 0))):
        with Locations((0, -8)):
            Circle(F16_R_3)
    extrude(amount=-F22_DEPTH, mode=Mode.SUBTRACT)

    # F16 (on face) → F23 (join)
    with BuildSketch(Plane(origin=(0, 45.5, 0), x_dir=(-1, 0, 0), z_dir=(0, 1, 0))):
        with Locations((0, -8)):
            Circle(F16_R_3)
    extrude(amount=-F23_DEPTH)


with BuildPart() as f15:
    # F11 (on face) → F15, piece 2 (new body)
    with BuildSketch(Plane.XY.offset(83)):
        Polygon((39, 49), (39, 46.9999983907), (46.9999983907, 46.9999983907), (46.9999983907, 39), (49, 39), (49, 49), align=None)
    extrude(amount=F15_DEPTH)


with BuildPart() as f15b:
    # F14 (on face) → F15, piece 3 (new body)
    with BuildSketch(Plane.XY.offset(83)):
        Polygon((47, -39), (47, -47), (39, -47), (39, -49), (49, -49), (49, -39), align=None)
    extrude(amount=F15_DEPTH)


with BuildPart() as f15c:
    # F13 (on face) → F15, piece 4 (new body)
    with BuildSketch(Plane.XY.offset(83)):
        Polygon((-39, -49), (-39, -47), (-47, -47), (-47, -39), (-49, -39), (-49, -49), align=None)
    extrude(amount=F15_DEPTH)


solid = Compound([f1.part, f1b.part, f1c.part, f1d.part, f2.part, f2b.part, f2c.part, f2d.part, f3.part, f3b.part, f3c.part, f3d.part, f4.part, f15.part, f15b.part, f15c.part])
